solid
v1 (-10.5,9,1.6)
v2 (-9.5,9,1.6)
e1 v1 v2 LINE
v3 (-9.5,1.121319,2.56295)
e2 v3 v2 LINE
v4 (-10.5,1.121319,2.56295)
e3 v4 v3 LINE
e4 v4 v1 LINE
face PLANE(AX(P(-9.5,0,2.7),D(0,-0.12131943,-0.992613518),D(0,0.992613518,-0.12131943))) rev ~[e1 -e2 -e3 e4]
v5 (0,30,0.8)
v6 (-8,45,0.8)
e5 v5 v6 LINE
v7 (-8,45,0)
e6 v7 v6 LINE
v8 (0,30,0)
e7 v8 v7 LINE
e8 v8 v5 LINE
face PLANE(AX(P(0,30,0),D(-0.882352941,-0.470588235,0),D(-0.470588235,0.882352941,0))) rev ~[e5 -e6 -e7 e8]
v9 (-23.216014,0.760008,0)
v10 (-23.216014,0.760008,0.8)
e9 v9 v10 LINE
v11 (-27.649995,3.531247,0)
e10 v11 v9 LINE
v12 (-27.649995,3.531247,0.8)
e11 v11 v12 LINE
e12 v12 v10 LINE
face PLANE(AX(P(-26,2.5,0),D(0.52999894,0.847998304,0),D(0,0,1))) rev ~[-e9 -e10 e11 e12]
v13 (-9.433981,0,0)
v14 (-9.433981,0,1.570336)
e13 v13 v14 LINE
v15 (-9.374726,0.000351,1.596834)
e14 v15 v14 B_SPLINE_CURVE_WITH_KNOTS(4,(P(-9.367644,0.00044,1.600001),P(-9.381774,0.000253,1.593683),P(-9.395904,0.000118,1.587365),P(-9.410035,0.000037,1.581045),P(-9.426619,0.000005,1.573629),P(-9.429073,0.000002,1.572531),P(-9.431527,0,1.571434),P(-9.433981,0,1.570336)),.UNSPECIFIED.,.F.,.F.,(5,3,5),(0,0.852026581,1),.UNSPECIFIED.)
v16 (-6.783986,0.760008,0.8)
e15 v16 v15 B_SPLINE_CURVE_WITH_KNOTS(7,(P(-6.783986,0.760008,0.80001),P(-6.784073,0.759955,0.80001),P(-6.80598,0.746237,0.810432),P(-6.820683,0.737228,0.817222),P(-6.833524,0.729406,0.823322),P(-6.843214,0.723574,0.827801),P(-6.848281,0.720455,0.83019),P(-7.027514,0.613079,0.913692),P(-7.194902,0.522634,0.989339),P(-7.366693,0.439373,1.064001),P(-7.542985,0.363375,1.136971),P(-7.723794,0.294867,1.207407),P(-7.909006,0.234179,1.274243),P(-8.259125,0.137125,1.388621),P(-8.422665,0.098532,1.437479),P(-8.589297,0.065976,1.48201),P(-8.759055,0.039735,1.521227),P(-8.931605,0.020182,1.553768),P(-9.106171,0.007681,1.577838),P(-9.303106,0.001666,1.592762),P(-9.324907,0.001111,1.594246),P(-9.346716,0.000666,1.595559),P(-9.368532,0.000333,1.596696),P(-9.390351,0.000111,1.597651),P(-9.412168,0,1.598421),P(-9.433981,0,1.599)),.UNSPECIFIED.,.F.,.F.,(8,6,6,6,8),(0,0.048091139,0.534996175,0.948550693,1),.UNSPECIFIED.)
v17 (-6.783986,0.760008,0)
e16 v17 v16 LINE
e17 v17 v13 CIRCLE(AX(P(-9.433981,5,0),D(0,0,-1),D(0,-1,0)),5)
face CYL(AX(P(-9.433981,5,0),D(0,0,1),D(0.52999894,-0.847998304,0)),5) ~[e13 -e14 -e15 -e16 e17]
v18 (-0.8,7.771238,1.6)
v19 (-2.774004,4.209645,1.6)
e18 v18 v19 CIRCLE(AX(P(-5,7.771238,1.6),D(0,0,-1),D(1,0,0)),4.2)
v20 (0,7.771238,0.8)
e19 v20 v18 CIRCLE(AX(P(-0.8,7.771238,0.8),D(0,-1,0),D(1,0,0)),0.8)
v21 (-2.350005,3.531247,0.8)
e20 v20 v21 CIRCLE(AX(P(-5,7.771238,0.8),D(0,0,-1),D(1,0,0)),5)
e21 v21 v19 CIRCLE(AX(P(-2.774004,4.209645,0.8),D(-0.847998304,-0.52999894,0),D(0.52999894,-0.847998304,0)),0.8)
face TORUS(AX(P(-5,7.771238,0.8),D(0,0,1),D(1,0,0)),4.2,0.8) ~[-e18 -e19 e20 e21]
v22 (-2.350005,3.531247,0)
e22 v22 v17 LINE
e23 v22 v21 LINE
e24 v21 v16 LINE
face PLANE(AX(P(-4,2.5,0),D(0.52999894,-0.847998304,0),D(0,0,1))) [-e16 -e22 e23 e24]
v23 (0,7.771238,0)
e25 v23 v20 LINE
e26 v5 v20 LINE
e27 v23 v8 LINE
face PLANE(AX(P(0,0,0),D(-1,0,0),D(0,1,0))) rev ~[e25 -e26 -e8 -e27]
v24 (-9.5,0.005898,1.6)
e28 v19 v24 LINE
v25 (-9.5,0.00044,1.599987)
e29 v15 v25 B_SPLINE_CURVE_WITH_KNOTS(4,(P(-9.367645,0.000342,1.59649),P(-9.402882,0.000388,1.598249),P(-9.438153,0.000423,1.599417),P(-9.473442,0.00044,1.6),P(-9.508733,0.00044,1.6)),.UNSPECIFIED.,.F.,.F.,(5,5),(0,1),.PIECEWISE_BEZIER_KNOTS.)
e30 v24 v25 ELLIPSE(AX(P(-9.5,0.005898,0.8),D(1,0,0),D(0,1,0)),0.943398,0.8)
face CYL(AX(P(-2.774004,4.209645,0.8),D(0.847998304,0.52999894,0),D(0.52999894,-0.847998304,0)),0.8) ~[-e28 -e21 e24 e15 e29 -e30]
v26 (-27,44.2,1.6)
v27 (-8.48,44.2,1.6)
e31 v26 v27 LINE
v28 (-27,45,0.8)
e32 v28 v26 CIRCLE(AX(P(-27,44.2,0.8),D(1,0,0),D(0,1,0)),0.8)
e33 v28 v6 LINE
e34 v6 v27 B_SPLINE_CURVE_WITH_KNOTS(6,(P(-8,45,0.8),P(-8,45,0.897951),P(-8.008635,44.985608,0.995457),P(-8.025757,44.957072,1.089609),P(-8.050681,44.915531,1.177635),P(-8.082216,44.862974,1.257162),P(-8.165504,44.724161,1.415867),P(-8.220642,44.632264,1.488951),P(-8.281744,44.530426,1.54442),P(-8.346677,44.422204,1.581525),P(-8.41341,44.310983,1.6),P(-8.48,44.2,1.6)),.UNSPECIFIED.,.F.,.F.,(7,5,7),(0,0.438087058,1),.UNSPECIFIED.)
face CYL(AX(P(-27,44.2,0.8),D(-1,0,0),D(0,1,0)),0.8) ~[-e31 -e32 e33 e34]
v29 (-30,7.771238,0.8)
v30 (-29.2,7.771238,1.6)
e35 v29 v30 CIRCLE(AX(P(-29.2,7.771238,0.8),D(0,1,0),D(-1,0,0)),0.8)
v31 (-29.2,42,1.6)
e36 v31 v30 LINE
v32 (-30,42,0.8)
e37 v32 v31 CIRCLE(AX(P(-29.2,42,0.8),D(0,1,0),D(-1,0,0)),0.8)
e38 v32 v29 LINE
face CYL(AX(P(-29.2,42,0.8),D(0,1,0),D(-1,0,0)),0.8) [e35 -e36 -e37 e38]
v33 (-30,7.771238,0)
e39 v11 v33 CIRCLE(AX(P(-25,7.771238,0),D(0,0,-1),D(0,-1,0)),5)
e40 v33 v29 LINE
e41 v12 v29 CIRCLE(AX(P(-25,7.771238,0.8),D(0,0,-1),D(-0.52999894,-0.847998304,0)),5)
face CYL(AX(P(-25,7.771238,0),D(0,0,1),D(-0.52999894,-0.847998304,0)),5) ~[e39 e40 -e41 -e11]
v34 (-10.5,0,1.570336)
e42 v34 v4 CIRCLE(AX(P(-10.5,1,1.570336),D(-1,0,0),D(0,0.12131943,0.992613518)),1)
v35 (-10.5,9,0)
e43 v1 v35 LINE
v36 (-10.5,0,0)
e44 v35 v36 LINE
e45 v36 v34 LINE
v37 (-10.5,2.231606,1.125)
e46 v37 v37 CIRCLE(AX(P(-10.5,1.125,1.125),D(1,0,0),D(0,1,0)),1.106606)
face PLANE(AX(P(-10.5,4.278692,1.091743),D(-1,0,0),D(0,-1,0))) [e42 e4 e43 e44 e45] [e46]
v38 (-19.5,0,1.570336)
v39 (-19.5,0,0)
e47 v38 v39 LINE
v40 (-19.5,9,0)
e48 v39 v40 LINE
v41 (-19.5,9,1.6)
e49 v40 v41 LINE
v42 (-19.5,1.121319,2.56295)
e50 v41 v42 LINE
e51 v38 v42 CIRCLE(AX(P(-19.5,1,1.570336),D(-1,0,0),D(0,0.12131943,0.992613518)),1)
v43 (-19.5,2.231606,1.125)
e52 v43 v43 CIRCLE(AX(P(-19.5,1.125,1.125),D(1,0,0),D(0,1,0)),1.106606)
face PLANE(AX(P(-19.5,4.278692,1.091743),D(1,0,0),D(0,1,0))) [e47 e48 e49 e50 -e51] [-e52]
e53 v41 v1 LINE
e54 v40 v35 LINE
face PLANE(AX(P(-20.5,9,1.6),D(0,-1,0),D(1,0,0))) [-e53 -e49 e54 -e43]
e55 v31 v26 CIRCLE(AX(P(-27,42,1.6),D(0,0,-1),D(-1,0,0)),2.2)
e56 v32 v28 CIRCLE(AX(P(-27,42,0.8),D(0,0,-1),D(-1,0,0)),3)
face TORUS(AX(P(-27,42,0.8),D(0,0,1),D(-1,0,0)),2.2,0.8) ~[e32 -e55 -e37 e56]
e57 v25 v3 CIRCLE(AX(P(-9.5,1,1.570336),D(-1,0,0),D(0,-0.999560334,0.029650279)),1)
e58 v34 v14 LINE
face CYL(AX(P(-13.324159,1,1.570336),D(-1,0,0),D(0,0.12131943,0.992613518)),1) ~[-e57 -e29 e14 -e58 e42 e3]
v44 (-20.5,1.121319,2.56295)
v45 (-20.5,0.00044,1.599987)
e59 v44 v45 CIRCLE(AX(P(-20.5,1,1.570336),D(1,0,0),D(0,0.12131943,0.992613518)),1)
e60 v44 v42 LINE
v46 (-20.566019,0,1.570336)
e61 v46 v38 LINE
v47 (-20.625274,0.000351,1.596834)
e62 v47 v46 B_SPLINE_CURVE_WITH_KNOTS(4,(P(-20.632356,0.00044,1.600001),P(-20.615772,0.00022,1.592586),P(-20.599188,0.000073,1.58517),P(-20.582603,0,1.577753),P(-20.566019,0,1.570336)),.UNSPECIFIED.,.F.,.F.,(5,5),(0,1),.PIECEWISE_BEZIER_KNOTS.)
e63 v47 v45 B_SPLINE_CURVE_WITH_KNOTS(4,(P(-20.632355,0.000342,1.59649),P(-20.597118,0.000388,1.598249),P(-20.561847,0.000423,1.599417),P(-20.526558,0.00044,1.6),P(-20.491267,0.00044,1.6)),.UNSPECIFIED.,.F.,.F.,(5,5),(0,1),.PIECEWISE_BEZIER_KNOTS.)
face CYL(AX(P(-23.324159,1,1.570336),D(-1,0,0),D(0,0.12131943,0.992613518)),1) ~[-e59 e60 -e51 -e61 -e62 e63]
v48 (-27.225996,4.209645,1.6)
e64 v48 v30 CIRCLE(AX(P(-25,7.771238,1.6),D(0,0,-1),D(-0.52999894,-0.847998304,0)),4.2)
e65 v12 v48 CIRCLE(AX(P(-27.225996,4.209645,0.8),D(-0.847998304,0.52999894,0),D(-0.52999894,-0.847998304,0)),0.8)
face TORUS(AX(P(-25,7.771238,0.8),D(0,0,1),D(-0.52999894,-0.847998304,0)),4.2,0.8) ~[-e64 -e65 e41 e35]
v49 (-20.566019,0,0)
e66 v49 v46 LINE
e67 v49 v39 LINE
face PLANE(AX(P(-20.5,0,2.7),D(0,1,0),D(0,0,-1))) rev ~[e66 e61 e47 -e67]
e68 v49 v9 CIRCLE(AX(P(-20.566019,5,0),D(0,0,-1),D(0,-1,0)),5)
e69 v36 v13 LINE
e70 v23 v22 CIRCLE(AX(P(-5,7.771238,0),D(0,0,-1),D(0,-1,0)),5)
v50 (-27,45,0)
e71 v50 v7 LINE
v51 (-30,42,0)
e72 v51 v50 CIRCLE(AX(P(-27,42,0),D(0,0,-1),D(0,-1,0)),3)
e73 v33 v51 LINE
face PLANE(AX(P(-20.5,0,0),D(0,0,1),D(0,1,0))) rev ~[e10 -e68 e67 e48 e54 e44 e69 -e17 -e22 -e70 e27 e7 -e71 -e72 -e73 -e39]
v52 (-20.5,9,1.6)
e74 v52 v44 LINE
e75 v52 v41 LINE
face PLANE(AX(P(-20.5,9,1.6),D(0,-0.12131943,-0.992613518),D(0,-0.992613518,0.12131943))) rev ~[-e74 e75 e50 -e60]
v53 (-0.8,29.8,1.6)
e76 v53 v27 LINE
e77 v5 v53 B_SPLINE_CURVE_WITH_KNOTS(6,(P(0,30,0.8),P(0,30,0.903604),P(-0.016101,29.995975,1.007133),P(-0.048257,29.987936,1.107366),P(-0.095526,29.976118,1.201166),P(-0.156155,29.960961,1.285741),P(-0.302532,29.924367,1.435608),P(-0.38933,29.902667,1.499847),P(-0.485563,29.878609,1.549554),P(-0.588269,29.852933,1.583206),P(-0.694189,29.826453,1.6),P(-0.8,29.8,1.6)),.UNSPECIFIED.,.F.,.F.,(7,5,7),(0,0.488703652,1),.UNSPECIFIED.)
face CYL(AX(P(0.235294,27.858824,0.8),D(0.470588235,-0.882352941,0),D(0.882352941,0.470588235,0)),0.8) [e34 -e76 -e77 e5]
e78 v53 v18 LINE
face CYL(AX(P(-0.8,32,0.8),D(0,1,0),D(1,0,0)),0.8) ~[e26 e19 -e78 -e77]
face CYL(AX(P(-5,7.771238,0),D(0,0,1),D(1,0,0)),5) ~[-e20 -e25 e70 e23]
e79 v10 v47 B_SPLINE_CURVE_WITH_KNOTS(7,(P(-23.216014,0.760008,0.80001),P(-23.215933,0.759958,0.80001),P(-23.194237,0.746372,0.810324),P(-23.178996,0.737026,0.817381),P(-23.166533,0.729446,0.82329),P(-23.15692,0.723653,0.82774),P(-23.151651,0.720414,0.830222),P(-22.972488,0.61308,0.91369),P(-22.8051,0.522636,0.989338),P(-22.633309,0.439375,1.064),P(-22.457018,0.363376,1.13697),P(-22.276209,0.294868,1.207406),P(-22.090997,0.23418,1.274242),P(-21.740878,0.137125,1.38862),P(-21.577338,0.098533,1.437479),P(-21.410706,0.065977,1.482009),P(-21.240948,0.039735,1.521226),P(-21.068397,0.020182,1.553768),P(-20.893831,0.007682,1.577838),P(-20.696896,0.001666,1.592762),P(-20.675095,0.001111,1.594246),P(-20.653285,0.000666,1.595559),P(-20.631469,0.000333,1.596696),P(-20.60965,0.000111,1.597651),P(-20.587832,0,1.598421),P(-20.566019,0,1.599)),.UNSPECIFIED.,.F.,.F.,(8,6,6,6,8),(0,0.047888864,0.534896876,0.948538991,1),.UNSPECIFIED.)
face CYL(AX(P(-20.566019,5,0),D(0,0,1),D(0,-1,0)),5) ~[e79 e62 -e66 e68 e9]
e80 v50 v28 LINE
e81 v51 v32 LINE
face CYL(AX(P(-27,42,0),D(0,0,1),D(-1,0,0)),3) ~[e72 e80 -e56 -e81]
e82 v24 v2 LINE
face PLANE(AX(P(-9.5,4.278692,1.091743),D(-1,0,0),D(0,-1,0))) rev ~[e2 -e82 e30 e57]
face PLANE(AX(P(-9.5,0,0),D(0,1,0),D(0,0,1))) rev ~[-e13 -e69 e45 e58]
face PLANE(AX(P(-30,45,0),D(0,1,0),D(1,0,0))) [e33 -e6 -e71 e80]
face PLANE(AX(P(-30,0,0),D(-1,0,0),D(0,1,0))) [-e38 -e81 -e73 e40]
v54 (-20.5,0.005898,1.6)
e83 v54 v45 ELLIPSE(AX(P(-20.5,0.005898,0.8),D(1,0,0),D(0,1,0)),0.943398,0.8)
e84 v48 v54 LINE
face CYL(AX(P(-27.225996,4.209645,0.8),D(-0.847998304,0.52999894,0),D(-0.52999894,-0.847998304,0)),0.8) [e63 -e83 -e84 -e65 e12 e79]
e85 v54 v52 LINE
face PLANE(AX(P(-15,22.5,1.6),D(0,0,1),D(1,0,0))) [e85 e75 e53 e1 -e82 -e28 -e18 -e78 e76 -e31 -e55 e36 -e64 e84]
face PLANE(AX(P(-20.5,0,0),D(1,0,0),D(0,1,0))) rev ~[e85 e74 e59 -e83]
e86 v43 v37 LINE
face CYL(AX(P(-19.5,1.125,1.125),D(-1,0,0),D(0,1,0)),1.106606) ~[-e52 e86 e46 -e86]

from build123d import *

# Parameters (mm, degrees)
F0_W          = 30
F0_H          = 45
F1_DEPTH      = 1.6
F2_SIZE2      = 8
F2_SIZE       = 5
F2_2_SIZE2    = 8
F2_2_SIZE     = 5
F3_R          = 3
F5_DEPTH      = 1.6
F6_W          = 11
F6_H          = 9
F7_DEPTH      = 2
F8_R          = 5
F10_DEPTH     = 1
F11_T1_DEPTH  = 6.6483183522
F13_DEPTH     = 1
F14_T1_DEPTH  = 6.6483183522
F16_T1_DEPTH  = 34.2287617925
F16_T3_DEPTH  = 24.2287617925
F16_T5_DEPTH  = 21
F16_T7_DEPTH  = 21
F16_T12_DEPTH = 8.6287617925
F16_T17_DEPTH = 8.6287617925
F16_T20_ANGLE = 57.9946167919
F16_T22_ANGLE = 90
F16_T24_ANGLE = 57.9946167919
F15_R         = 1.1066061355
F17_DEPTH     = 9


# Not quite as in the source:
# - a fillet or chamfer that OpenCascade refuses, or shapes differently, is made with other operations: its cross-section is extruded or revolved along the edge and cut away or added


with BuildPart() as f1:
    # F0 (on Top) → F1 (new body)
    with BuildSketch(Plane.XY):
        with Locations((-15, 22.5)):
            Rectangle(F0_W, F0_H)
    extrude(amount=F1_DEPTH)

    # F2
    f2_edges = [f1.edges().sort_by_distance(p)[0] for p in [
        (0, 0, 0.8),
    ]]
    f2_side = f1.faces().sort_by_distance((0, 22.5, 0.8))[0]
    chamfer(f2_edges, length=F2_SIZE, length2=F2_SIZE2, reference=f2_side)

    # F2#2
    f2_2_edges = [f1.edges().sort_by_distance(p)[0] for p in [
        (-30, 0, 0.8),
    ]]
    f2_2_side = f1.faces().sort_by_distance((-30, 22.5, 0.8))[0]
    chamfer(f2_2_edges, length=F2_2_SIZE, length2=F2_2_SIZE2, reference=f2_2_side)

    # F3
    f3_edges = [f1.edges().sort_by_distance(p)[0] for p in [
        (0, 45, 0.8),
        (-30, 45, 0.8),
    ]]
    fillet(f3_edges, radius=F3_R)

    # F4 (on face) → F5 (cut)
    with BuildSketch(Plane(origin=(0, 0, 0), x_dir=(1, 0, 0), z_dir=(0, 0, -1))):
        Polygon((0, -45), (0, -30), (-8, -45), align=None)
    extrude(amount=-F5_DEPTH, mode=Mode.SUBTRACT)

    # F6 (on face) → F7 (cut)
    with BuildSketch(Plane.XY.offset(1.6)):
        with Locations((-15, 4.5)):
            Rectangle(F6_W, F6_H)
    extrude(amount=-F7_DEPTH, mode=Mode.SUBTRACT)

    # F8
    f8_edges = [f1.edges().sort_by_distance(p)[0] for p in [
        (0, 5, 0.8),
        (-8, 0, 0.8),
        (-22, 0, 0.8),
        (-30, 5, 0.8),
    ]]
    fillet(f8_edges, radius=F8_R)

    # F9 (on face) → F10 (join)
    with BuildSketch(Plane(origin=(-9.5, 0, 0), x_dir=(0, -1, 0), z_dir=(-1, 0, 0))):
        Polygon((0, 2.7), (-9, 1.6), (-9, 0), (0, 0), align=None)
    extrude(amount=F10_DEPTH)

    # F11: fillet of radius 1 on 1 edges, made by hand

    # F11_s2 → F11_t1 (cut)
    with BuildSketch(Plane.YZ.offset(-13.3241591761)):
        with BuildLine():
            ThreePointArc((1.12131943, 2.5629498474), (0.3371725073, 2.3191084678), (0, 1.5703363296))
            Line((0, 1.5703363296), (0, 2.7))
            Line((0, 2.7), (1.12131943, 2.5629498474))
        make_face()
    extrude(amount=F11_T1_DEPTH, mode=Mode.SUBTRACT)

    # F12 (on face) → F13 (join)
    with BuildSketch(Plane.YZ.offset(-20.5)):
        Polygon((0, 2.7), (0, 0), (9, 0), (9, 1.6), align=None)
    extrude(amount=F13_DEPTH)

    # F14: fillet of radius 1 on 1 edges, made by hand

    # F14_s2 → F14_t1 (cut)
    with BuildSketch(Plane.YZ.offset(-23.3241591761)):
        with BuildLine():
            ThreePointArc((1.12131943, 2.5629498474), (0.3371725073, 2.3191084678), (0, 1.5703363296))
            Line((0, 1.5703363296), (0, 2.7))
            Line((0, 2.7), (1.12131943, 2.5629498474))
        make_face()
    extrude(amount=F14_T1_DEPTH, mode=Mode.SUBTRACT)

    # F16: fillet of radius 0.8 on 9 edges, made by hand

    # F16_s2 → F16_t1 (cut)
    with BuildSketch(Plane.XZ.offset(-42)):
        with BuildLine():
            ThreePointArc((-30, 0.8), (-29.7656854249, 1.3656854249), (-29.2, 1.6))
            Line((-29.2, 1.6), (-30, 1.6))
            Line((-30, 1.6), (-30, 0.8))
        make_face()
    extrude(amount=F16_T1_DEPTH, mode=Mode.SUBTRACT)

    # F16_s4 → F16_t3 (cut)
    with BuildSketch(Plane.XZ.offset(-32)):
        with BuildLine():
            ThreePointArc((0, 0.8), (-0.2343145751, 1.3656854249), (-0.8, 1.6))
            Line((-0.8, 1.6), (0, 1.6))
            Line((0, 1.6), (0, 0.8))
        make_face()
    extrude(amount=F16_T3_DEPTH, mode=Mode.SUBTRACT)

    # F16_s6 → F16_t5 (cut)
    with BuildSketch(Plane.YZ.offset(-27)):
        with BuildLine():
            ThreePointArc((45, 0.8), (44.7656854249, 1.3656854249), (44.2, 1.6))
            Line((44.2, 1.6), (45, 1.6))
            Line((45, 1.6), (45, 0.8))
        make_face()
    extrude(amount=F16_T5_DEPTH, mode=Mode.SUBTRACT)

    # F16_s8 → F16_t7 (cut)
    with BuildSketch(Plane(origin=(-11.5155709343, 21.5916955017, 0), x_dir=(0, 0, 1), z_dir=(-0.4705882353, 0.8823529412, 0))):
        with BuildLine():
            ThreePointArc((0.8, 14.1176470588), (1.3656854249, 13.8833324838), (1.6, 13.3176470588))
            Line((1.6, 13.3176470588), (1.6, 14.1176470588))
            Line((1.6, 14.1176470588), (0.8, 14.1176470588))
        make_face()
    extrude(amount=F16_T7_DEPTH, mode=Mode.SUBTRACT)


with BuildPart() as f16_tool10:
    # F16_s11 → F16_t12 (new body)
    with BuildSketch(Plane(origin=(-21.4702194191, 13.4188871369, 0), x_dir=(0, 0, 1), z_dir=(0.847998304, -0.52999894, 0))):
        with BuildLine():
            ThreePointArc((0.8, 11.6599766801), (1.3656854249, 11.425662105), (1.6, 10.8599766801))
            Line((1.6, 10.8599766801), (1.6, 11.6599766801))
            Line((1.6, 11.6599766801), (0.8, 11.6599766801))
        make_face()
    extrude(amount=F16_T12_DEPTH)

    split(bisect_by=Plane.YZ.offset(-20.5), keep=Keep.BOTTOM)


with BuildPart() as f1_1:
    add(f1.part)

    # F16_t9: cut F16_tool10
    add(f16_tool10.part, mode=Mode.SUBTRACT)


with BuildPart() as f16_tool15:
    # F16_s16 → F16_t17 (new body)
    with BuildSketch(Plane(origin=(-0.1028142887, -0.0642589305, 0), x_dir=(0, 0, 1), z_dir=(-0.847998304, -0.52999894, 0))):
        with BuildLine():
            ThreePointArc((0.8, 4.23999152), (1.3656854249, 4.4743060951), (1.6, 5.03999152))
            Line((1.6, 5.03999152), (1.6, 4.23999152))
            Line((1.6, 4.23999152), (0.8, 4.23999152))
        make_face()
    extrude(amount=F16_T17_DEPTH)

    split(bisect_by=Plane.YZ.offset(-9.5), keep=Keep.TOP)


with BuildPart() as f1_2:
    add(f1_1.part)

    # F16_t14: cut F16_tool15
    add(f16_tool15.part, mode=Mode.SUBTRACT)

    # F16_s19 → F16_t20 (revolve, cut)
    with BuildSketch(Plane.XZ.offset(-7.7712382075)):
        with BuildLine():
            ThreePointArc((0, 0.8), (-0.2343145751, 1.3656854249), (-0.8, 1.6))
            Line((-0.8, 1.6), (0, 1.6))
            Line((0, 1.6), (0, 0.8))
        make_face()
    revolve(axis=Axis((-5, 7.7712382075, 1.6), (0, 0, -1)), revolution_arc=F16_T20_ANGLE, mode=Mode.SUBTRACT)

    # F16_s21 → F16_t22 (revolve, cut)
    with BuildSketch(Plane.XZ.offset(-42)):
        with BuildLine():
            ThreePointArc((-30, 0.8), (-29.7656854249, 1.3656854249), (-29.2, 1.6))
            Line((-29.2, 1.6), (-30, 1.6))
            Line((-30, 1.6), (-30, 0.8))
        make_face()
    revolve(axis=Axis((-27, 42, 1.6), (0, 0, -1)), revolution_arc=F16_T22_ANGLE, mode=Mode.SUBTRACT)

    # F16_s23 → F16_t24 (revolve, cut)
    with BuildSketch(Plane(origin=(-21.4702194191, 13.4188871369, 0), x_dir=(0, 0, 1), z_dir=(0.847998304, -0.52999894, 0))):
        with BuildLine():
            ThreePointArc((0.8, 11.6599766801), (1.3656854249, 11.425662105), (1.6, 10.8599766801))
            Line((1.6, 10.8599766801), (1.6, 11.6599766801))
            Line((1.6, 11.6599766801), (0.8, 11.6599766801))
        make_face()
    revolve(axis=Axis((-25, 7.7712382075, 1.6), (0, 0, -1)), revolution_arc=F16_T24_ANGLE, mode=Mode.SUBTRACT)

    # F15 (on face) → F17 (join)
    with BuildSketch(Plane.YZ.offset(-19.5)):
        with Locations((1.125, 1.125)):
            Circle(F15_R)
    extrude(amount=F17_DEPTH)


solid = f1_2.part
